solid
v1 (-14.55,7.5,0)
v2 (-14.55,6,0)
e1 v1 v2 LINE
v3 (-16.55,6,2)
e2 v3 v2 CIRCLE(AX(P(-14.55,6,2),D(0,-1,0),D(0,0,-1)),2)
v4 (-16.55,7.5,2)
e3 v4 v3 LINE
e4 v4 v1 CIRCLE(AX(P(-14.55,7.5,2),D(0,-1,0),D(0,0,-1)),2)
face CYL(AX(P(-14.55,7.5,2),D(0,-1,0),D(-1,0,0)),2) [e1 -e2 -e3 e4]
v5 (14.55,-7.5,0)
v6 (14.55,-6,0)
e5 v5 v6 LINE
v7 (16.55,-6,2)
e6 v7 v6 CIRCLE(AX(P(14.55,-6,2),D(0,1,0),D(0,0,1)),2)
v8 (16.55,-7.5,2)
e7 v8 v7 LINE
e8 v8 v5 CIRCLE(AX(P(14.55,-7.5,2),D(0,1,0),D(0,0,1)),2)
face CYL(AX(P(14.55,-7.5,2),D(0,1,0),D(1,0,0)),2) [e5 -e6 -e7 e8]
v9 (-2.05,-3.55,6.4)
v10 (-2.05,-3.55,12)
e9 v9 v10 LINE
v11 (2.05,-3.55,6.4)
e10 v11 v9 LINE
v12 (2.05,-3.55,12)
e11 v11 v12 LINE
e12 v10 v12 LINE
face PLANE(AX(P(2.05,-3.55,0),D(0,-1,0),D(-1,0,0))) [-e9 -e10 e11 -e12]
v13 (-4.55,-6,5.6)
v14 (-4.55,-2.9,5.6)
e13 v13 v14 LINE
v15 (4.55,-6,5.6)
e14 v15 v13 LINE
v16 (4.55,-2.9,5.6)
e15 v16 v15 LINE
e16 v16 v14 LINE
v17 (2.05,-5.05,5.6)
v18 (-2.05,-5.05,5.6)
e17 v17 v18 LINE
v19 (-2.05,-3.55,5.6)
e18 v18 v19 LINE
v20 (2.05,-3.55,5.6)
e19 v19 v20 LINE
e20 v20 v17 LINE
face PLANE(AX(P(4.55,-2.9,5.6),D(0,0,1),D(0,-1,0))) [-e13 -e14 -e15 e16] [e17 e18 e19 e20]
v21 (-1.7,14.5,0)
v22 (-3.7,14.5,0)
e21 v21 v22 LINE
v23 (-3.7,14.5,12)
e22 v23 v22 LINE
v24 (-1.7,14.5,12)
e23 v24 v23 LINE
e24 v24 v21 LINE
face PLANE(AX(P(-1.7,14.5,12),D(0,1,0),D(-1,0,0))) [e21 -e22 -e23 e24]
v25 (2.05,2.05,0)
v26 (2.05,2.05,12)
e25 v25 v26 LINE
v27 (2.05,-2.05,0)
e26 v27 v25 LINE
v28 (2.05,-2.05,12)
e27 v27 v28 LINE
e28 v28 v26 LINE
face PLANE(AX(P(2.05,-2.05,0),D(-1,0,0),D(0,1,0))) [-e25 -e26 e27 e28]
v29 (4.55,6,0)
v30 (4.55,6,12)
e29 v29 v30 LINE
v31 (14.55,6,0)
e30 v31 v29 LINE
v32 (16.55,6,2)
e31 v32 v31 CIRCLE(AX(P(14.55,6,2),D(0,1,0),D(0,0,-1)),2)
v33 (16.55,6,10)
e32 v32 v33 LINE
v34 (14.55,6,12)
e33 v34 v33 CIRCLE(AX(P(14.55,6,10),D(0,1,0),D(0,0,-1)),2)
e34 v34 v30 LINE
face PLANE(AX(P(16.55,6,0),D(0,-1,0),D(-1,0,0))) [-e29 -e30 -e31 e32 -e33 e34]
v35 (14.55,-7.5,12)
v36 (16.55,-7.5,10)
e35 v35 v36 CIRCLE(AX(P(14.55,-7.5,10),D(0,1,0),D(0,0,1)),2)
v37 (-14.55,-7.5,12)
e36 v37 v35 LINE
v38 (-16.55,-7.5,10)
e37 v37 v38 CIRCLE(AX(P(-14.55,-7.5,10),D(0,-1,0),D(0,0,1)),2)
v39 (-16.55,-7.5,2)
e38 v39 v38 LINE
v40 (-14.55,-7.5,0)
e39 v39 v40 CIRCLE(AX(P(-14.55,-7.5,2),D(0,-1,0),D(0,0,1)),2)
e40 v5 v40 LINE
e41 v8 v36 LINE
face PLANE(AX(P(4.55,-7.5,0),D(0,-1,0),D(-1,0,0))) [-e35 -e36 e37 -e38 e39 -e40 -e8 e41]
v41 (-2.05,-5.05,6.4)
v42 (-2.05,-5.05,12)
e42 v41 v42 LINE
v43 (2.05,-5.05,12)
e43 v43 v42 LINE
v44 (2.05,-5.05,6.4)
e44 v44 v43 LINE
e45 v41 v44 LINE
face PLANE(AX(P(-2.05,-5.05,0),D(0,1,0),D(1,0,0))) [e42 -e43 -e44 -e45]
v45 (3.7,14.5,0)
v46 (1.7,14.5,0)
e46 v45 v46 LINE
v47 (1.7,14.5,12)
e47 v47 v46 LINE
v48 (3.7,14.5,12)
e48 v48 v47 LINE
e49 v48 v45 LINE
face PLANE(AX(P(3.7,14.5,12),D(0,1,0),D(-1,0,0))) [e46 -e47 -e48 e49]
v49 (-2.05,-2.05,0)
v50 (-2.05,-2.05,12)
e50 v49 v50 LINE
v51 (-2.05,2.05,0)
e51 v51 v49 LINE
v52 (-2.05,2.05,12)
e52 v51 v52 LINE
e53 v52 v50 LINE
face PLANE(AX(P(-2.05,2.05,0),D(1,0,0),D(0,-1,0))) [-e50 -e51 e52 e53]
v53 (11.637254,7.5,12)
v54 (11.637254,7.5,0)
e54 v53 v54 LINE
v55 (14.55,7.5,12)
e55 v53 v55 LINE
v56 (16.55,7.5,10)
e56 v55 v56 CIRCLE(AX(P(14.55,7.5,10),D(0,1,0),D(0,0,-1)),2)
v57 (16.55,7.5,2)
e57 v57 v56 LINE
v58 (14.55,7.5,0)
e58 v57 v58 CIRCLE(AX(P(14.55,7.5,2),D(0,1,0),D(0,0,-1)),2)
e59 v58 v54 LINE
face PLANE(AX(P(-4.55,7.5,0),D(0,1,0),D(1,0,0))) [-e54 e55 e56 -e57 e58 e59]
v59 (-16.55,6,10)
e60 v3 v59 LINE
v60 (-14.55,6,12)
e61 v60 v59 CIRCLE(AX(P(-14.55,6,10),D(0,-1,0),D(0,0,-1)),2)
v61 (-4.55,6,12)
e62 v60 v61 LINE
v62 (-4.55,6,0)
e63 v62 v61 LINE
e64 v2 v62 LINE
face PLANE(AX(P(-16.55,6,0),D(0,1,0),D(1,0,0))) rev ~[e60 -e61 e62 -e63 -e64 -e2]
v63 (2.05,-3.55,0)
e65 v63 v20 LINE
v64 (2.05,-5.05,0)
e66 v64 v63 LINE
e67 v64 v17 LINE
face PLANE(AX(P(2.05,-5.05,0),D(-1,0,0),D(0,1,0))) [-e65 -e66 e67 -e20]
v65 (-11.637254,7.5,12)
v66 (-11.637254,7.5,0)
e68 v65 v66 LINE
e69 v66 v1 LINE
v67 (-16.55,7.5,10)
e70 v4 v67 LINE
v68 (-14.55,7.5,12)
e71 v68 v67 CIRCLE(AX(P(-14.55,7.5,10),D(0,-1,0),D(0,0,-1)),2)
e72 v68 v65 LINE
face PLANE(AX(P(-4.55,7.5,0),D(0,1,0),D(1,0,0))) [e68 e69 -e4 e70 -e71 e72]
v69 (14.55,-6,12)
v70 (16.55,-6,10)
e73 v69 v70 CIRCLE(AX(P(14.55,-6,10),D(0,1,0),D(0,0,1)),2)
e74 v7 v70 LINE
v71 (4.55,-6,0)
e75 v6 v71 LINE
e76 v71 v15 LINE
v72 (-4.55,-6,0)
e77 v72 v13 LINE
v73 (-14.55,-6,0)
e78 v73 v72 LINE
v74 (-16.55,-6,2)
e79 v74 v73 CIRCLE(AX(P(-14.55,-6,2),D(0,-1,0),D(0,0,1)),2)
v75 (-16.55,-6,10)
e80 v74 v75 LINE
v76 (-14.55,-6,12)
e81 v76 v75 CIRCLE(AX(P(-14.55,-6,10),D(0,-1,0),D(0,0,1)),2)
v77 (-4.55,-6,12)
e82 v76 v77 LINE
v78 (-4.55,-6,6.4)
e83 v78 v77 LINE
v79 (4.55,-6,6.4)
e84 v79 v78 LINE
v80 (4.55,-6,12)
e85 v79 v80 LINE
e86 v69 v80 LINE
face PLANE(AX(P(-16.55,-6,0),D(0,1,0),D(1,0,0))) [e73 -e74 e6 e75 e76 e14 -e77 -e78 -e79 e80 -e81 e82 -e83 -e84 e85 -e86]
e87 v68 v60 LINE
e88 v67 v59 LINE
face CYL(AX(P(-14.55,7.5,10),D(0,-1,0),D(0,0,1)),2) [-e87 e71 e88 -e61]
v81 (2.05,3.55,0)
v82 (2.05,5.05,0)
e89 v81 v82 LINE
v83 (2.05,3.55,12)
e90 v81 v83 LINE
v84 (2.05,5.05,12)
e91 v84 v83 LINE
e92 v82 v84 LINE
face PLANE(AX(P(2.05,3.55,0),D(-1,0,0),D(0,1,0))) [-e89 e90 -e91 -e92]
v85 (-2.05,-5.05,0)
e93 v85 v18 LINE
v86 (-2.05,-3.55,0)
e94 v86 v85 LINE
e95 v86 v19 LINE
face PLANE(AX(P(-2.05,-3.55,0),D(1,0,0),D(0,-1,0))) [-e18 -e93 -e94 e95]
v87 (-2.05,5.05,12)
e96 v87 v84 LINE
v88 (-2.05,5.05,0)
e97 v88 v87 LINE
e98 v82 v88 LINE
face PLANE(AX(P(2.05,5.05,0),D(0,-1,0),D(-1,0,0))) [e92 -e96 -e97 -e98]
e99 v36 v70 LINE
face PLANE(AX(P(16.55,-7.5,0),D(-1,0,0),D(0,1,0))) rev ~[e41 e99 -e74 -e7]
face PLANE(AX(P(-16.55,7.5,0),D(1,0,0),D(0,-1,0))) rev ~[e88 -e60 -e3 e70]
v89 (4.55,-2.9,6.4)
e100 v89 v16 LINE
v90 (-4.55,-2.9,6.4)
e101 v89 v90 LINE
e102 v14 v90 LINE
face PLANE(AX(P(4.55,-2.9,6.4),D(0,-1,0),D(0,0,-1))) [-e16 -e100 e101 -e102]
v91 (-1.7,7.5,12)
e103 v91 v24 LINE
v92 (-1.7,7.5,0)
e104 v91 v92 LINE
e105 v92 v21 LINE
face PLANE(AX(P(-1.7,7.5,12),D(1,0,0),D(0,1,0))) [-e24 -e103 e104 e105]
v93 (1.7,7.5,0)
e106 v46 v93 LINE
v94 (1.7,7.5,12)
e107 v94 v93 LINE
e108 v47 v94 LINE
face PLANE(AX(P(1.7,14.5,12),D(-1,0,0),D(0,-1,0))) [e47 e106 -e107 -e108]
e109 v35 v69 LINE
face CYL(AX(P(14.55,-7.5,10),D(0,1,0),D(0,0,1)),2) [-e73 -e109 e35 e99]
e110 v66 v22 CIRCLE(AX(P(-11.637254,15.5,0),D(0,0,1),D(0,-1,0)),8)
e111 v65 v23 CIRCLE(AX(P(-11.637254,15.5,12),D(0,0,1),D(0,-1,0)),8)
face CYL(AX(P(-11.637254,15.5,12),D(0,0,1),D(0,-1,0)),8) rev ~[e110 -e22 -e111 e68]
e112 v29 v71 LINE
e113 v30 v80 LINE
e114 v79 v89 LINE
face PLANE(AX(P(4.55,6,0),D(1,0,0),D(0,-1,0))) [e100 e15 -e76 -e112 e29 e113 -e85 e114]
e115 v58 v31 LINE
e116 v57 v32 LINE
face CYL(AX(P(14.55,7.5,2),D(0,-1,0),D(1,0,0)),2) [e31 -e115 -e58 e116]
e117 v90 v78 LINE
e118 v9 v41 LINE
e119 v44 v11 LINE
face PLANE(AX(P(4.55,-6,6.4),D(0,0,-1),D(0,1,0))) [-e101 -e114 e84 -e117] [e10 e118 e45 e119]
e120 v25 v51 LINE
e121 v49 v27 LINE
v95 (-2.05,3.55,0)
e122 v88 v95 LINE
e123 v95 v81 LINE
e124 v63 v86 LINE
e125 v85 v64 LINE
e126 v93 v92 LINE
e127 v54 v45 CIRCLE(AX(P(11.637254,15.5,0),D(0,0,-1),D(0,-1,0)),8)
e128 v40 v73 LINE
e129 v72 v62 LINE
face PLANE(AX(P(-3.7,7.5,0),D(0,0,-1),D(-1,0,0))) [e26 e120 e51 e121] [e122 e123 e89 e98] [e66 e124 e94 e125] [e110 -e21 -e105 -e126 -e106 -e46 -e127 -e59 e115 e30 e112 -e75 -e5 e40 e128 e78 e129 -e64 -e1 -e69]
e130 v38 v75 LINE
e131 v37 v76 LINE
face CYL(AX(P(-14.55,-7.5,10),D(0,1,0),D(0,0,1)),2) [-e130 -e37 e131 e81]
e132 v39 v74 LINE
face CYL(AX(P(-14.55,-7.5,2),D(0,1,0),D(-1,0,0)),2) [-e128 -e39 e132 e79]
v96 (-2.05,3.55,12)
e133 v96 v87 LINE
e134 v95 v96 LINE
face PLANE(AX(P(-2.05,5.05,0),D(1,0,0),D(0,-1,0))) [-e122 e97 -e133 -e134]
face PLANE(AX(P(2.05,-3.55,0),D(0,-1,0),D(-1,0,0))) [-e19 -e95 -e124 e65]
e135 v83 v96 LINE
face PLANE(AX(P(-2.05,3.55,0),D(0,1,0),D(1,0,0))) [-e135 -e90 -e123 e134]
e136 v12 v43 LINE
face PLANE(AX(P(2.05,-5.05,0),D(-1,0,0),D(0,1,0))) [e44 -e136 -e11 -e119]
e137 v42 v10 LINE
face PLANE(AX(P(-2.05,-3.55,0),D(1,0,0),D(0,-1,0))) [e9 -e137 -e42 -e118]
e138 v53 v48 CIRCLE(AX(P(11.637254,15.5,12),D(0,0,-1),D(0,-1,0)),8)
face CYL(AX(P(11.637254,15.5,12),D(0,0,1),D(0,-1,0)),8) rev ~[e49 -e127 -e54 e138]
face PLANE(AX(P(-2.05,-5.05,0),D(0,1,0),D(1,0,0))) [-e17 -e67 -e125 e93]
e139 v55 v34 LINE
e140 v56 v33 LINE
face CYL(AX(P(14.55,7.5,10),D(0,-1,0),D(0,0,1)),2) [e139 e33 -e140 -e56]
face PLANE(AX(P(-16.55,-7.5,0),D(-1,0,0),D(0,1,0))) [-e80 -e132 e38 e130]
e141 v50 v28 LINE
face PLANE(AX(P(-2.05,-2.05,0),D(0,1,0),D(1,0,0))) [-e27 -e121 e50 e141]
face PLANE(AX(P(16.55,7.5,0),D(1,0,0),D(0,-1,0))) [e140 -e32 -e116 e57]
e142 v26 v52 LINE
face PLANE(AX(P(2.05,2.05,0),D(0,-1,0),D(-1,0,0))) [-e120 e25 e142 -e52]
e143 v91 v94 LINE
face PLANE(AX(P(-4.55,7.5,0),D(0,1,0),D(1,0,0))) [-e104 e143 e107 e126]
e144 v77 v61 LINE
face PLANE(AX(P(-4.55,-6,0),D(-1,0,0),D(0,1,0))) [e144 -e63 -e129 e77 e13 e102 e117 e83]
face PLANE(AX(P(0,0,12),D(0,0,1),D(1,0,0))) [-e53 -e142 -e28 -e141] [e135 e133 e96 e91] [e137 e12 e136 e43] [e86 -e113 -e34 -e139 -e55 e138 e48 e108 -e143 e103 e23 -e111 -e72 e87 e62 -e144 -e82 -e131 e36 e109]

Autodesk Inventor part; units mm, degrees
sketch "Sketch1" plane through (0, 0, 0) normal (0, 0, 1) x (1, 0, 0)
  line L0 (-4.55, 7.5) -> (4.55, 7.5)
  line L1 (4.55, 7.5) -> (4.55, -7.5)
  line L2 (4.55, -7.5) -> (-4.55, -7.5)
  line L3 (-4.55, -7.5) -> (-4.55, 7.5)
  line L4 (-4.55, 7.5) -> (4.55, -7.5) construction
  line L5 (4.55, 7.5) -> (-4.55, -7.5) construction
  line L6 (-2.05, -2.05) -> (2.05, -2.05)
  line L7 (2.05, -2.05) -> (2.05, 2.05)
  line L8 (2.05, 2.05) -> (-2.05, 2.05)
  line L9 (-2.05, 2.05) -> (-2.05, -2.05)
  line L10 (-2.05, -2.05) -> (2.05, 2.05) construction
  line L11 (2.05, -2.05) -> (-2.05, 2.05) construction
  line L12 (-4.55, 7.5) -> (-16.55, 7.5)
  line L13 (-16.55, 7.5) -> (-16.55, 6)
  line L14 (-16.55, 6) -> (-4.55, 6)
  line L15 (-4.55, 6) -> (-4.55, 7.5)
  line L16 (-4.55, -7.5) -> (-16.55, -7.5)
  line L17 (-16.55, -7.5) -> (-16.55, -6)
  line L18 (-16.55, -6) -> (-4.55, -6)
  line L19 (-4.55, -6) -> (-4.55, -7.5)
  line L20 (4.55, 7.5) -> (16.55, 7.5)
  line L21 (16.55, 7.5) -> (16.55, 6)
  line L22 (16.55, 6) -> (4.55, 6)
  line L23 (4.55, 6) -> (4.55, 7.5)
  line L24 (4.55, -7.5) -> (16.55, -7.5)
  line L25 (16.55, -7.5) -> (16.55, -6)
  line L26 (16.55, -6) -> (4.55, -6)
  line L27 (4.55, -6) -> (4.55, -7.5)
  point P0 (0, 0)
  point P1 (-4.55, 6)
  point P2 (-4.55, -6)
  point P3 (4.55, 6)
  dimension "d0" = 15
  dimension "d1" = 9.1
  dimension "d2" = 4.1
  dimension "d3" = 4.1
  dimension "d4" = 12
  dimension "d5" = 1.5
  dimension "d8" = 1.5
  dimension "d9" = 12
  dimension "d10" = 12
  dimension "d11" = 1.5
  dimension "d12" = 12
extrude "Extrusion1" add sketch "Sketch1" along normal blind 12
sketch "Sketch2" plane through (0, 0, 12) normal (0, 0, 1) x (1, 0, 0)
  line L0 (16.55, 7.5) -> (-16.55, 7.5) projected
  line L1 (-3.7, 7.5) -> (-1.7, 7.5)
  line L2 (-1.7, 7.5) -> (-1.7, 14.5)
  line L3 (-1.7, 14.5) -> (-3.7, 14.5)
  line L4 (-3.7, 14.5) -> (-3.7, 7.5)
  line L5 (1.7, 7.5) -> (3.7, 7.5)
  line L6 (3.7, 7.5) -> (3.7, 14.5)
  line L7 (3.7, 14.5) -> (1.7, 14.5)
  line L8 (1.7, 14.5) -> (1.7, 7.5)
  point P0 (0, 0)
  dimension "d15" = 2
  dimension "d16" = 2
  dimension "d17" = 7
  dimension "d18" = 7
  dimension "d19" = 1.7
  dimension "d20" = 1.7
extrude "Extrusion2" add sketch "Sketch2" against normal up to surface (12 mm away)
fillet "Fillet1" radius 8 2 edges at (3.7, 7.5, 6) (-3.7, 7.5, 6)
sketch "Sketch3" plane through (4.55, -6, 0) normal (1, 0, 0) x (0, 0, -1)
  line L0 (-6.4, 3.1) -> (-5.6, 3.1)
  line L1 (-5.6, 3.1) -> (-5.6, 0)
  line L2 (-5.6, 0) -> (-6.4, 0)
  line L3 (-6.4, 0) -> (-6.4, 3.1)
  line L4 (0, 12) -> (-12, 12) projected
  line L5 (0, 0) -> (0, 12) projected
  line L6 (0, 0) -> (-12, 0) projected
  point P0 (0, 6)
  dimension "d24" = 3.1
  dimension "d25" = 0.8
  dimension "d30" = 0
  dimension "d39" = 12
  dimension "d40" = 5.6
extrude "Extrusion3" cut sketch "Sketch3" against normal through all
sketch "Sketch5" plane through (0, 0, 0) normal (0, 0, -1) x (-1, 0, 0)
  line L0 (-2.05, 5.05) -> (2.05, 5.05)
  line L1 (2.05, 5.05) -> (2.05, 3.55)
  line L2 (2.05, 3.55) -> (-2.05, 3.55)
  line L3 (-2.05, 3.55) -> (-2.05, 5.05)
  line L4 (-2.05, -3.55) -> (2.05, -3.55)
  line L5 (2.05, -3.55) -> (2.05, -5.05)
  line L6 (2.05, -5.05) -> (-2.05, -5.05)
  line L7 (-2.05, -5.05) -> (-2.05, -3.55)
  line L8 (2.05, 2.05) -> (-2.05, 2.05) projected
  line L9 (2.05, -2.05) -> (2.05, 2.05) projected
  line L10 (-2.05, -2.05) -> (2.05, -2.05) projected
  point P0 (0, 0)
  dimension "d31" = 4.1
  dimension "d32" = 4.1
  dimension "d33" = 1.5
  dimension "d34" = 1.5
  dimension "d35" = 1.5
  dimension "d36" = 1.5
extrude "Extrusion4" cut sketch "Sketch5" against normal through all
fillet "Fillet2" radius 2 8 edges at (-16.55, 6.75, 0) (-16.55, 6.75, 12) (-16.55, -6.75, 0) (-16.55, -6.75, 12) (16.55, 6.75, 12) (16.55, -6.75, 12) (16.55, 6.75, 0) (16.55, -6.75, 0)
equation "\"d40\" = -0.5 * d25 + 0.5 * d39"
equation "\"d31\" = d32"
properties part number "wing_honeycomb_interface"
